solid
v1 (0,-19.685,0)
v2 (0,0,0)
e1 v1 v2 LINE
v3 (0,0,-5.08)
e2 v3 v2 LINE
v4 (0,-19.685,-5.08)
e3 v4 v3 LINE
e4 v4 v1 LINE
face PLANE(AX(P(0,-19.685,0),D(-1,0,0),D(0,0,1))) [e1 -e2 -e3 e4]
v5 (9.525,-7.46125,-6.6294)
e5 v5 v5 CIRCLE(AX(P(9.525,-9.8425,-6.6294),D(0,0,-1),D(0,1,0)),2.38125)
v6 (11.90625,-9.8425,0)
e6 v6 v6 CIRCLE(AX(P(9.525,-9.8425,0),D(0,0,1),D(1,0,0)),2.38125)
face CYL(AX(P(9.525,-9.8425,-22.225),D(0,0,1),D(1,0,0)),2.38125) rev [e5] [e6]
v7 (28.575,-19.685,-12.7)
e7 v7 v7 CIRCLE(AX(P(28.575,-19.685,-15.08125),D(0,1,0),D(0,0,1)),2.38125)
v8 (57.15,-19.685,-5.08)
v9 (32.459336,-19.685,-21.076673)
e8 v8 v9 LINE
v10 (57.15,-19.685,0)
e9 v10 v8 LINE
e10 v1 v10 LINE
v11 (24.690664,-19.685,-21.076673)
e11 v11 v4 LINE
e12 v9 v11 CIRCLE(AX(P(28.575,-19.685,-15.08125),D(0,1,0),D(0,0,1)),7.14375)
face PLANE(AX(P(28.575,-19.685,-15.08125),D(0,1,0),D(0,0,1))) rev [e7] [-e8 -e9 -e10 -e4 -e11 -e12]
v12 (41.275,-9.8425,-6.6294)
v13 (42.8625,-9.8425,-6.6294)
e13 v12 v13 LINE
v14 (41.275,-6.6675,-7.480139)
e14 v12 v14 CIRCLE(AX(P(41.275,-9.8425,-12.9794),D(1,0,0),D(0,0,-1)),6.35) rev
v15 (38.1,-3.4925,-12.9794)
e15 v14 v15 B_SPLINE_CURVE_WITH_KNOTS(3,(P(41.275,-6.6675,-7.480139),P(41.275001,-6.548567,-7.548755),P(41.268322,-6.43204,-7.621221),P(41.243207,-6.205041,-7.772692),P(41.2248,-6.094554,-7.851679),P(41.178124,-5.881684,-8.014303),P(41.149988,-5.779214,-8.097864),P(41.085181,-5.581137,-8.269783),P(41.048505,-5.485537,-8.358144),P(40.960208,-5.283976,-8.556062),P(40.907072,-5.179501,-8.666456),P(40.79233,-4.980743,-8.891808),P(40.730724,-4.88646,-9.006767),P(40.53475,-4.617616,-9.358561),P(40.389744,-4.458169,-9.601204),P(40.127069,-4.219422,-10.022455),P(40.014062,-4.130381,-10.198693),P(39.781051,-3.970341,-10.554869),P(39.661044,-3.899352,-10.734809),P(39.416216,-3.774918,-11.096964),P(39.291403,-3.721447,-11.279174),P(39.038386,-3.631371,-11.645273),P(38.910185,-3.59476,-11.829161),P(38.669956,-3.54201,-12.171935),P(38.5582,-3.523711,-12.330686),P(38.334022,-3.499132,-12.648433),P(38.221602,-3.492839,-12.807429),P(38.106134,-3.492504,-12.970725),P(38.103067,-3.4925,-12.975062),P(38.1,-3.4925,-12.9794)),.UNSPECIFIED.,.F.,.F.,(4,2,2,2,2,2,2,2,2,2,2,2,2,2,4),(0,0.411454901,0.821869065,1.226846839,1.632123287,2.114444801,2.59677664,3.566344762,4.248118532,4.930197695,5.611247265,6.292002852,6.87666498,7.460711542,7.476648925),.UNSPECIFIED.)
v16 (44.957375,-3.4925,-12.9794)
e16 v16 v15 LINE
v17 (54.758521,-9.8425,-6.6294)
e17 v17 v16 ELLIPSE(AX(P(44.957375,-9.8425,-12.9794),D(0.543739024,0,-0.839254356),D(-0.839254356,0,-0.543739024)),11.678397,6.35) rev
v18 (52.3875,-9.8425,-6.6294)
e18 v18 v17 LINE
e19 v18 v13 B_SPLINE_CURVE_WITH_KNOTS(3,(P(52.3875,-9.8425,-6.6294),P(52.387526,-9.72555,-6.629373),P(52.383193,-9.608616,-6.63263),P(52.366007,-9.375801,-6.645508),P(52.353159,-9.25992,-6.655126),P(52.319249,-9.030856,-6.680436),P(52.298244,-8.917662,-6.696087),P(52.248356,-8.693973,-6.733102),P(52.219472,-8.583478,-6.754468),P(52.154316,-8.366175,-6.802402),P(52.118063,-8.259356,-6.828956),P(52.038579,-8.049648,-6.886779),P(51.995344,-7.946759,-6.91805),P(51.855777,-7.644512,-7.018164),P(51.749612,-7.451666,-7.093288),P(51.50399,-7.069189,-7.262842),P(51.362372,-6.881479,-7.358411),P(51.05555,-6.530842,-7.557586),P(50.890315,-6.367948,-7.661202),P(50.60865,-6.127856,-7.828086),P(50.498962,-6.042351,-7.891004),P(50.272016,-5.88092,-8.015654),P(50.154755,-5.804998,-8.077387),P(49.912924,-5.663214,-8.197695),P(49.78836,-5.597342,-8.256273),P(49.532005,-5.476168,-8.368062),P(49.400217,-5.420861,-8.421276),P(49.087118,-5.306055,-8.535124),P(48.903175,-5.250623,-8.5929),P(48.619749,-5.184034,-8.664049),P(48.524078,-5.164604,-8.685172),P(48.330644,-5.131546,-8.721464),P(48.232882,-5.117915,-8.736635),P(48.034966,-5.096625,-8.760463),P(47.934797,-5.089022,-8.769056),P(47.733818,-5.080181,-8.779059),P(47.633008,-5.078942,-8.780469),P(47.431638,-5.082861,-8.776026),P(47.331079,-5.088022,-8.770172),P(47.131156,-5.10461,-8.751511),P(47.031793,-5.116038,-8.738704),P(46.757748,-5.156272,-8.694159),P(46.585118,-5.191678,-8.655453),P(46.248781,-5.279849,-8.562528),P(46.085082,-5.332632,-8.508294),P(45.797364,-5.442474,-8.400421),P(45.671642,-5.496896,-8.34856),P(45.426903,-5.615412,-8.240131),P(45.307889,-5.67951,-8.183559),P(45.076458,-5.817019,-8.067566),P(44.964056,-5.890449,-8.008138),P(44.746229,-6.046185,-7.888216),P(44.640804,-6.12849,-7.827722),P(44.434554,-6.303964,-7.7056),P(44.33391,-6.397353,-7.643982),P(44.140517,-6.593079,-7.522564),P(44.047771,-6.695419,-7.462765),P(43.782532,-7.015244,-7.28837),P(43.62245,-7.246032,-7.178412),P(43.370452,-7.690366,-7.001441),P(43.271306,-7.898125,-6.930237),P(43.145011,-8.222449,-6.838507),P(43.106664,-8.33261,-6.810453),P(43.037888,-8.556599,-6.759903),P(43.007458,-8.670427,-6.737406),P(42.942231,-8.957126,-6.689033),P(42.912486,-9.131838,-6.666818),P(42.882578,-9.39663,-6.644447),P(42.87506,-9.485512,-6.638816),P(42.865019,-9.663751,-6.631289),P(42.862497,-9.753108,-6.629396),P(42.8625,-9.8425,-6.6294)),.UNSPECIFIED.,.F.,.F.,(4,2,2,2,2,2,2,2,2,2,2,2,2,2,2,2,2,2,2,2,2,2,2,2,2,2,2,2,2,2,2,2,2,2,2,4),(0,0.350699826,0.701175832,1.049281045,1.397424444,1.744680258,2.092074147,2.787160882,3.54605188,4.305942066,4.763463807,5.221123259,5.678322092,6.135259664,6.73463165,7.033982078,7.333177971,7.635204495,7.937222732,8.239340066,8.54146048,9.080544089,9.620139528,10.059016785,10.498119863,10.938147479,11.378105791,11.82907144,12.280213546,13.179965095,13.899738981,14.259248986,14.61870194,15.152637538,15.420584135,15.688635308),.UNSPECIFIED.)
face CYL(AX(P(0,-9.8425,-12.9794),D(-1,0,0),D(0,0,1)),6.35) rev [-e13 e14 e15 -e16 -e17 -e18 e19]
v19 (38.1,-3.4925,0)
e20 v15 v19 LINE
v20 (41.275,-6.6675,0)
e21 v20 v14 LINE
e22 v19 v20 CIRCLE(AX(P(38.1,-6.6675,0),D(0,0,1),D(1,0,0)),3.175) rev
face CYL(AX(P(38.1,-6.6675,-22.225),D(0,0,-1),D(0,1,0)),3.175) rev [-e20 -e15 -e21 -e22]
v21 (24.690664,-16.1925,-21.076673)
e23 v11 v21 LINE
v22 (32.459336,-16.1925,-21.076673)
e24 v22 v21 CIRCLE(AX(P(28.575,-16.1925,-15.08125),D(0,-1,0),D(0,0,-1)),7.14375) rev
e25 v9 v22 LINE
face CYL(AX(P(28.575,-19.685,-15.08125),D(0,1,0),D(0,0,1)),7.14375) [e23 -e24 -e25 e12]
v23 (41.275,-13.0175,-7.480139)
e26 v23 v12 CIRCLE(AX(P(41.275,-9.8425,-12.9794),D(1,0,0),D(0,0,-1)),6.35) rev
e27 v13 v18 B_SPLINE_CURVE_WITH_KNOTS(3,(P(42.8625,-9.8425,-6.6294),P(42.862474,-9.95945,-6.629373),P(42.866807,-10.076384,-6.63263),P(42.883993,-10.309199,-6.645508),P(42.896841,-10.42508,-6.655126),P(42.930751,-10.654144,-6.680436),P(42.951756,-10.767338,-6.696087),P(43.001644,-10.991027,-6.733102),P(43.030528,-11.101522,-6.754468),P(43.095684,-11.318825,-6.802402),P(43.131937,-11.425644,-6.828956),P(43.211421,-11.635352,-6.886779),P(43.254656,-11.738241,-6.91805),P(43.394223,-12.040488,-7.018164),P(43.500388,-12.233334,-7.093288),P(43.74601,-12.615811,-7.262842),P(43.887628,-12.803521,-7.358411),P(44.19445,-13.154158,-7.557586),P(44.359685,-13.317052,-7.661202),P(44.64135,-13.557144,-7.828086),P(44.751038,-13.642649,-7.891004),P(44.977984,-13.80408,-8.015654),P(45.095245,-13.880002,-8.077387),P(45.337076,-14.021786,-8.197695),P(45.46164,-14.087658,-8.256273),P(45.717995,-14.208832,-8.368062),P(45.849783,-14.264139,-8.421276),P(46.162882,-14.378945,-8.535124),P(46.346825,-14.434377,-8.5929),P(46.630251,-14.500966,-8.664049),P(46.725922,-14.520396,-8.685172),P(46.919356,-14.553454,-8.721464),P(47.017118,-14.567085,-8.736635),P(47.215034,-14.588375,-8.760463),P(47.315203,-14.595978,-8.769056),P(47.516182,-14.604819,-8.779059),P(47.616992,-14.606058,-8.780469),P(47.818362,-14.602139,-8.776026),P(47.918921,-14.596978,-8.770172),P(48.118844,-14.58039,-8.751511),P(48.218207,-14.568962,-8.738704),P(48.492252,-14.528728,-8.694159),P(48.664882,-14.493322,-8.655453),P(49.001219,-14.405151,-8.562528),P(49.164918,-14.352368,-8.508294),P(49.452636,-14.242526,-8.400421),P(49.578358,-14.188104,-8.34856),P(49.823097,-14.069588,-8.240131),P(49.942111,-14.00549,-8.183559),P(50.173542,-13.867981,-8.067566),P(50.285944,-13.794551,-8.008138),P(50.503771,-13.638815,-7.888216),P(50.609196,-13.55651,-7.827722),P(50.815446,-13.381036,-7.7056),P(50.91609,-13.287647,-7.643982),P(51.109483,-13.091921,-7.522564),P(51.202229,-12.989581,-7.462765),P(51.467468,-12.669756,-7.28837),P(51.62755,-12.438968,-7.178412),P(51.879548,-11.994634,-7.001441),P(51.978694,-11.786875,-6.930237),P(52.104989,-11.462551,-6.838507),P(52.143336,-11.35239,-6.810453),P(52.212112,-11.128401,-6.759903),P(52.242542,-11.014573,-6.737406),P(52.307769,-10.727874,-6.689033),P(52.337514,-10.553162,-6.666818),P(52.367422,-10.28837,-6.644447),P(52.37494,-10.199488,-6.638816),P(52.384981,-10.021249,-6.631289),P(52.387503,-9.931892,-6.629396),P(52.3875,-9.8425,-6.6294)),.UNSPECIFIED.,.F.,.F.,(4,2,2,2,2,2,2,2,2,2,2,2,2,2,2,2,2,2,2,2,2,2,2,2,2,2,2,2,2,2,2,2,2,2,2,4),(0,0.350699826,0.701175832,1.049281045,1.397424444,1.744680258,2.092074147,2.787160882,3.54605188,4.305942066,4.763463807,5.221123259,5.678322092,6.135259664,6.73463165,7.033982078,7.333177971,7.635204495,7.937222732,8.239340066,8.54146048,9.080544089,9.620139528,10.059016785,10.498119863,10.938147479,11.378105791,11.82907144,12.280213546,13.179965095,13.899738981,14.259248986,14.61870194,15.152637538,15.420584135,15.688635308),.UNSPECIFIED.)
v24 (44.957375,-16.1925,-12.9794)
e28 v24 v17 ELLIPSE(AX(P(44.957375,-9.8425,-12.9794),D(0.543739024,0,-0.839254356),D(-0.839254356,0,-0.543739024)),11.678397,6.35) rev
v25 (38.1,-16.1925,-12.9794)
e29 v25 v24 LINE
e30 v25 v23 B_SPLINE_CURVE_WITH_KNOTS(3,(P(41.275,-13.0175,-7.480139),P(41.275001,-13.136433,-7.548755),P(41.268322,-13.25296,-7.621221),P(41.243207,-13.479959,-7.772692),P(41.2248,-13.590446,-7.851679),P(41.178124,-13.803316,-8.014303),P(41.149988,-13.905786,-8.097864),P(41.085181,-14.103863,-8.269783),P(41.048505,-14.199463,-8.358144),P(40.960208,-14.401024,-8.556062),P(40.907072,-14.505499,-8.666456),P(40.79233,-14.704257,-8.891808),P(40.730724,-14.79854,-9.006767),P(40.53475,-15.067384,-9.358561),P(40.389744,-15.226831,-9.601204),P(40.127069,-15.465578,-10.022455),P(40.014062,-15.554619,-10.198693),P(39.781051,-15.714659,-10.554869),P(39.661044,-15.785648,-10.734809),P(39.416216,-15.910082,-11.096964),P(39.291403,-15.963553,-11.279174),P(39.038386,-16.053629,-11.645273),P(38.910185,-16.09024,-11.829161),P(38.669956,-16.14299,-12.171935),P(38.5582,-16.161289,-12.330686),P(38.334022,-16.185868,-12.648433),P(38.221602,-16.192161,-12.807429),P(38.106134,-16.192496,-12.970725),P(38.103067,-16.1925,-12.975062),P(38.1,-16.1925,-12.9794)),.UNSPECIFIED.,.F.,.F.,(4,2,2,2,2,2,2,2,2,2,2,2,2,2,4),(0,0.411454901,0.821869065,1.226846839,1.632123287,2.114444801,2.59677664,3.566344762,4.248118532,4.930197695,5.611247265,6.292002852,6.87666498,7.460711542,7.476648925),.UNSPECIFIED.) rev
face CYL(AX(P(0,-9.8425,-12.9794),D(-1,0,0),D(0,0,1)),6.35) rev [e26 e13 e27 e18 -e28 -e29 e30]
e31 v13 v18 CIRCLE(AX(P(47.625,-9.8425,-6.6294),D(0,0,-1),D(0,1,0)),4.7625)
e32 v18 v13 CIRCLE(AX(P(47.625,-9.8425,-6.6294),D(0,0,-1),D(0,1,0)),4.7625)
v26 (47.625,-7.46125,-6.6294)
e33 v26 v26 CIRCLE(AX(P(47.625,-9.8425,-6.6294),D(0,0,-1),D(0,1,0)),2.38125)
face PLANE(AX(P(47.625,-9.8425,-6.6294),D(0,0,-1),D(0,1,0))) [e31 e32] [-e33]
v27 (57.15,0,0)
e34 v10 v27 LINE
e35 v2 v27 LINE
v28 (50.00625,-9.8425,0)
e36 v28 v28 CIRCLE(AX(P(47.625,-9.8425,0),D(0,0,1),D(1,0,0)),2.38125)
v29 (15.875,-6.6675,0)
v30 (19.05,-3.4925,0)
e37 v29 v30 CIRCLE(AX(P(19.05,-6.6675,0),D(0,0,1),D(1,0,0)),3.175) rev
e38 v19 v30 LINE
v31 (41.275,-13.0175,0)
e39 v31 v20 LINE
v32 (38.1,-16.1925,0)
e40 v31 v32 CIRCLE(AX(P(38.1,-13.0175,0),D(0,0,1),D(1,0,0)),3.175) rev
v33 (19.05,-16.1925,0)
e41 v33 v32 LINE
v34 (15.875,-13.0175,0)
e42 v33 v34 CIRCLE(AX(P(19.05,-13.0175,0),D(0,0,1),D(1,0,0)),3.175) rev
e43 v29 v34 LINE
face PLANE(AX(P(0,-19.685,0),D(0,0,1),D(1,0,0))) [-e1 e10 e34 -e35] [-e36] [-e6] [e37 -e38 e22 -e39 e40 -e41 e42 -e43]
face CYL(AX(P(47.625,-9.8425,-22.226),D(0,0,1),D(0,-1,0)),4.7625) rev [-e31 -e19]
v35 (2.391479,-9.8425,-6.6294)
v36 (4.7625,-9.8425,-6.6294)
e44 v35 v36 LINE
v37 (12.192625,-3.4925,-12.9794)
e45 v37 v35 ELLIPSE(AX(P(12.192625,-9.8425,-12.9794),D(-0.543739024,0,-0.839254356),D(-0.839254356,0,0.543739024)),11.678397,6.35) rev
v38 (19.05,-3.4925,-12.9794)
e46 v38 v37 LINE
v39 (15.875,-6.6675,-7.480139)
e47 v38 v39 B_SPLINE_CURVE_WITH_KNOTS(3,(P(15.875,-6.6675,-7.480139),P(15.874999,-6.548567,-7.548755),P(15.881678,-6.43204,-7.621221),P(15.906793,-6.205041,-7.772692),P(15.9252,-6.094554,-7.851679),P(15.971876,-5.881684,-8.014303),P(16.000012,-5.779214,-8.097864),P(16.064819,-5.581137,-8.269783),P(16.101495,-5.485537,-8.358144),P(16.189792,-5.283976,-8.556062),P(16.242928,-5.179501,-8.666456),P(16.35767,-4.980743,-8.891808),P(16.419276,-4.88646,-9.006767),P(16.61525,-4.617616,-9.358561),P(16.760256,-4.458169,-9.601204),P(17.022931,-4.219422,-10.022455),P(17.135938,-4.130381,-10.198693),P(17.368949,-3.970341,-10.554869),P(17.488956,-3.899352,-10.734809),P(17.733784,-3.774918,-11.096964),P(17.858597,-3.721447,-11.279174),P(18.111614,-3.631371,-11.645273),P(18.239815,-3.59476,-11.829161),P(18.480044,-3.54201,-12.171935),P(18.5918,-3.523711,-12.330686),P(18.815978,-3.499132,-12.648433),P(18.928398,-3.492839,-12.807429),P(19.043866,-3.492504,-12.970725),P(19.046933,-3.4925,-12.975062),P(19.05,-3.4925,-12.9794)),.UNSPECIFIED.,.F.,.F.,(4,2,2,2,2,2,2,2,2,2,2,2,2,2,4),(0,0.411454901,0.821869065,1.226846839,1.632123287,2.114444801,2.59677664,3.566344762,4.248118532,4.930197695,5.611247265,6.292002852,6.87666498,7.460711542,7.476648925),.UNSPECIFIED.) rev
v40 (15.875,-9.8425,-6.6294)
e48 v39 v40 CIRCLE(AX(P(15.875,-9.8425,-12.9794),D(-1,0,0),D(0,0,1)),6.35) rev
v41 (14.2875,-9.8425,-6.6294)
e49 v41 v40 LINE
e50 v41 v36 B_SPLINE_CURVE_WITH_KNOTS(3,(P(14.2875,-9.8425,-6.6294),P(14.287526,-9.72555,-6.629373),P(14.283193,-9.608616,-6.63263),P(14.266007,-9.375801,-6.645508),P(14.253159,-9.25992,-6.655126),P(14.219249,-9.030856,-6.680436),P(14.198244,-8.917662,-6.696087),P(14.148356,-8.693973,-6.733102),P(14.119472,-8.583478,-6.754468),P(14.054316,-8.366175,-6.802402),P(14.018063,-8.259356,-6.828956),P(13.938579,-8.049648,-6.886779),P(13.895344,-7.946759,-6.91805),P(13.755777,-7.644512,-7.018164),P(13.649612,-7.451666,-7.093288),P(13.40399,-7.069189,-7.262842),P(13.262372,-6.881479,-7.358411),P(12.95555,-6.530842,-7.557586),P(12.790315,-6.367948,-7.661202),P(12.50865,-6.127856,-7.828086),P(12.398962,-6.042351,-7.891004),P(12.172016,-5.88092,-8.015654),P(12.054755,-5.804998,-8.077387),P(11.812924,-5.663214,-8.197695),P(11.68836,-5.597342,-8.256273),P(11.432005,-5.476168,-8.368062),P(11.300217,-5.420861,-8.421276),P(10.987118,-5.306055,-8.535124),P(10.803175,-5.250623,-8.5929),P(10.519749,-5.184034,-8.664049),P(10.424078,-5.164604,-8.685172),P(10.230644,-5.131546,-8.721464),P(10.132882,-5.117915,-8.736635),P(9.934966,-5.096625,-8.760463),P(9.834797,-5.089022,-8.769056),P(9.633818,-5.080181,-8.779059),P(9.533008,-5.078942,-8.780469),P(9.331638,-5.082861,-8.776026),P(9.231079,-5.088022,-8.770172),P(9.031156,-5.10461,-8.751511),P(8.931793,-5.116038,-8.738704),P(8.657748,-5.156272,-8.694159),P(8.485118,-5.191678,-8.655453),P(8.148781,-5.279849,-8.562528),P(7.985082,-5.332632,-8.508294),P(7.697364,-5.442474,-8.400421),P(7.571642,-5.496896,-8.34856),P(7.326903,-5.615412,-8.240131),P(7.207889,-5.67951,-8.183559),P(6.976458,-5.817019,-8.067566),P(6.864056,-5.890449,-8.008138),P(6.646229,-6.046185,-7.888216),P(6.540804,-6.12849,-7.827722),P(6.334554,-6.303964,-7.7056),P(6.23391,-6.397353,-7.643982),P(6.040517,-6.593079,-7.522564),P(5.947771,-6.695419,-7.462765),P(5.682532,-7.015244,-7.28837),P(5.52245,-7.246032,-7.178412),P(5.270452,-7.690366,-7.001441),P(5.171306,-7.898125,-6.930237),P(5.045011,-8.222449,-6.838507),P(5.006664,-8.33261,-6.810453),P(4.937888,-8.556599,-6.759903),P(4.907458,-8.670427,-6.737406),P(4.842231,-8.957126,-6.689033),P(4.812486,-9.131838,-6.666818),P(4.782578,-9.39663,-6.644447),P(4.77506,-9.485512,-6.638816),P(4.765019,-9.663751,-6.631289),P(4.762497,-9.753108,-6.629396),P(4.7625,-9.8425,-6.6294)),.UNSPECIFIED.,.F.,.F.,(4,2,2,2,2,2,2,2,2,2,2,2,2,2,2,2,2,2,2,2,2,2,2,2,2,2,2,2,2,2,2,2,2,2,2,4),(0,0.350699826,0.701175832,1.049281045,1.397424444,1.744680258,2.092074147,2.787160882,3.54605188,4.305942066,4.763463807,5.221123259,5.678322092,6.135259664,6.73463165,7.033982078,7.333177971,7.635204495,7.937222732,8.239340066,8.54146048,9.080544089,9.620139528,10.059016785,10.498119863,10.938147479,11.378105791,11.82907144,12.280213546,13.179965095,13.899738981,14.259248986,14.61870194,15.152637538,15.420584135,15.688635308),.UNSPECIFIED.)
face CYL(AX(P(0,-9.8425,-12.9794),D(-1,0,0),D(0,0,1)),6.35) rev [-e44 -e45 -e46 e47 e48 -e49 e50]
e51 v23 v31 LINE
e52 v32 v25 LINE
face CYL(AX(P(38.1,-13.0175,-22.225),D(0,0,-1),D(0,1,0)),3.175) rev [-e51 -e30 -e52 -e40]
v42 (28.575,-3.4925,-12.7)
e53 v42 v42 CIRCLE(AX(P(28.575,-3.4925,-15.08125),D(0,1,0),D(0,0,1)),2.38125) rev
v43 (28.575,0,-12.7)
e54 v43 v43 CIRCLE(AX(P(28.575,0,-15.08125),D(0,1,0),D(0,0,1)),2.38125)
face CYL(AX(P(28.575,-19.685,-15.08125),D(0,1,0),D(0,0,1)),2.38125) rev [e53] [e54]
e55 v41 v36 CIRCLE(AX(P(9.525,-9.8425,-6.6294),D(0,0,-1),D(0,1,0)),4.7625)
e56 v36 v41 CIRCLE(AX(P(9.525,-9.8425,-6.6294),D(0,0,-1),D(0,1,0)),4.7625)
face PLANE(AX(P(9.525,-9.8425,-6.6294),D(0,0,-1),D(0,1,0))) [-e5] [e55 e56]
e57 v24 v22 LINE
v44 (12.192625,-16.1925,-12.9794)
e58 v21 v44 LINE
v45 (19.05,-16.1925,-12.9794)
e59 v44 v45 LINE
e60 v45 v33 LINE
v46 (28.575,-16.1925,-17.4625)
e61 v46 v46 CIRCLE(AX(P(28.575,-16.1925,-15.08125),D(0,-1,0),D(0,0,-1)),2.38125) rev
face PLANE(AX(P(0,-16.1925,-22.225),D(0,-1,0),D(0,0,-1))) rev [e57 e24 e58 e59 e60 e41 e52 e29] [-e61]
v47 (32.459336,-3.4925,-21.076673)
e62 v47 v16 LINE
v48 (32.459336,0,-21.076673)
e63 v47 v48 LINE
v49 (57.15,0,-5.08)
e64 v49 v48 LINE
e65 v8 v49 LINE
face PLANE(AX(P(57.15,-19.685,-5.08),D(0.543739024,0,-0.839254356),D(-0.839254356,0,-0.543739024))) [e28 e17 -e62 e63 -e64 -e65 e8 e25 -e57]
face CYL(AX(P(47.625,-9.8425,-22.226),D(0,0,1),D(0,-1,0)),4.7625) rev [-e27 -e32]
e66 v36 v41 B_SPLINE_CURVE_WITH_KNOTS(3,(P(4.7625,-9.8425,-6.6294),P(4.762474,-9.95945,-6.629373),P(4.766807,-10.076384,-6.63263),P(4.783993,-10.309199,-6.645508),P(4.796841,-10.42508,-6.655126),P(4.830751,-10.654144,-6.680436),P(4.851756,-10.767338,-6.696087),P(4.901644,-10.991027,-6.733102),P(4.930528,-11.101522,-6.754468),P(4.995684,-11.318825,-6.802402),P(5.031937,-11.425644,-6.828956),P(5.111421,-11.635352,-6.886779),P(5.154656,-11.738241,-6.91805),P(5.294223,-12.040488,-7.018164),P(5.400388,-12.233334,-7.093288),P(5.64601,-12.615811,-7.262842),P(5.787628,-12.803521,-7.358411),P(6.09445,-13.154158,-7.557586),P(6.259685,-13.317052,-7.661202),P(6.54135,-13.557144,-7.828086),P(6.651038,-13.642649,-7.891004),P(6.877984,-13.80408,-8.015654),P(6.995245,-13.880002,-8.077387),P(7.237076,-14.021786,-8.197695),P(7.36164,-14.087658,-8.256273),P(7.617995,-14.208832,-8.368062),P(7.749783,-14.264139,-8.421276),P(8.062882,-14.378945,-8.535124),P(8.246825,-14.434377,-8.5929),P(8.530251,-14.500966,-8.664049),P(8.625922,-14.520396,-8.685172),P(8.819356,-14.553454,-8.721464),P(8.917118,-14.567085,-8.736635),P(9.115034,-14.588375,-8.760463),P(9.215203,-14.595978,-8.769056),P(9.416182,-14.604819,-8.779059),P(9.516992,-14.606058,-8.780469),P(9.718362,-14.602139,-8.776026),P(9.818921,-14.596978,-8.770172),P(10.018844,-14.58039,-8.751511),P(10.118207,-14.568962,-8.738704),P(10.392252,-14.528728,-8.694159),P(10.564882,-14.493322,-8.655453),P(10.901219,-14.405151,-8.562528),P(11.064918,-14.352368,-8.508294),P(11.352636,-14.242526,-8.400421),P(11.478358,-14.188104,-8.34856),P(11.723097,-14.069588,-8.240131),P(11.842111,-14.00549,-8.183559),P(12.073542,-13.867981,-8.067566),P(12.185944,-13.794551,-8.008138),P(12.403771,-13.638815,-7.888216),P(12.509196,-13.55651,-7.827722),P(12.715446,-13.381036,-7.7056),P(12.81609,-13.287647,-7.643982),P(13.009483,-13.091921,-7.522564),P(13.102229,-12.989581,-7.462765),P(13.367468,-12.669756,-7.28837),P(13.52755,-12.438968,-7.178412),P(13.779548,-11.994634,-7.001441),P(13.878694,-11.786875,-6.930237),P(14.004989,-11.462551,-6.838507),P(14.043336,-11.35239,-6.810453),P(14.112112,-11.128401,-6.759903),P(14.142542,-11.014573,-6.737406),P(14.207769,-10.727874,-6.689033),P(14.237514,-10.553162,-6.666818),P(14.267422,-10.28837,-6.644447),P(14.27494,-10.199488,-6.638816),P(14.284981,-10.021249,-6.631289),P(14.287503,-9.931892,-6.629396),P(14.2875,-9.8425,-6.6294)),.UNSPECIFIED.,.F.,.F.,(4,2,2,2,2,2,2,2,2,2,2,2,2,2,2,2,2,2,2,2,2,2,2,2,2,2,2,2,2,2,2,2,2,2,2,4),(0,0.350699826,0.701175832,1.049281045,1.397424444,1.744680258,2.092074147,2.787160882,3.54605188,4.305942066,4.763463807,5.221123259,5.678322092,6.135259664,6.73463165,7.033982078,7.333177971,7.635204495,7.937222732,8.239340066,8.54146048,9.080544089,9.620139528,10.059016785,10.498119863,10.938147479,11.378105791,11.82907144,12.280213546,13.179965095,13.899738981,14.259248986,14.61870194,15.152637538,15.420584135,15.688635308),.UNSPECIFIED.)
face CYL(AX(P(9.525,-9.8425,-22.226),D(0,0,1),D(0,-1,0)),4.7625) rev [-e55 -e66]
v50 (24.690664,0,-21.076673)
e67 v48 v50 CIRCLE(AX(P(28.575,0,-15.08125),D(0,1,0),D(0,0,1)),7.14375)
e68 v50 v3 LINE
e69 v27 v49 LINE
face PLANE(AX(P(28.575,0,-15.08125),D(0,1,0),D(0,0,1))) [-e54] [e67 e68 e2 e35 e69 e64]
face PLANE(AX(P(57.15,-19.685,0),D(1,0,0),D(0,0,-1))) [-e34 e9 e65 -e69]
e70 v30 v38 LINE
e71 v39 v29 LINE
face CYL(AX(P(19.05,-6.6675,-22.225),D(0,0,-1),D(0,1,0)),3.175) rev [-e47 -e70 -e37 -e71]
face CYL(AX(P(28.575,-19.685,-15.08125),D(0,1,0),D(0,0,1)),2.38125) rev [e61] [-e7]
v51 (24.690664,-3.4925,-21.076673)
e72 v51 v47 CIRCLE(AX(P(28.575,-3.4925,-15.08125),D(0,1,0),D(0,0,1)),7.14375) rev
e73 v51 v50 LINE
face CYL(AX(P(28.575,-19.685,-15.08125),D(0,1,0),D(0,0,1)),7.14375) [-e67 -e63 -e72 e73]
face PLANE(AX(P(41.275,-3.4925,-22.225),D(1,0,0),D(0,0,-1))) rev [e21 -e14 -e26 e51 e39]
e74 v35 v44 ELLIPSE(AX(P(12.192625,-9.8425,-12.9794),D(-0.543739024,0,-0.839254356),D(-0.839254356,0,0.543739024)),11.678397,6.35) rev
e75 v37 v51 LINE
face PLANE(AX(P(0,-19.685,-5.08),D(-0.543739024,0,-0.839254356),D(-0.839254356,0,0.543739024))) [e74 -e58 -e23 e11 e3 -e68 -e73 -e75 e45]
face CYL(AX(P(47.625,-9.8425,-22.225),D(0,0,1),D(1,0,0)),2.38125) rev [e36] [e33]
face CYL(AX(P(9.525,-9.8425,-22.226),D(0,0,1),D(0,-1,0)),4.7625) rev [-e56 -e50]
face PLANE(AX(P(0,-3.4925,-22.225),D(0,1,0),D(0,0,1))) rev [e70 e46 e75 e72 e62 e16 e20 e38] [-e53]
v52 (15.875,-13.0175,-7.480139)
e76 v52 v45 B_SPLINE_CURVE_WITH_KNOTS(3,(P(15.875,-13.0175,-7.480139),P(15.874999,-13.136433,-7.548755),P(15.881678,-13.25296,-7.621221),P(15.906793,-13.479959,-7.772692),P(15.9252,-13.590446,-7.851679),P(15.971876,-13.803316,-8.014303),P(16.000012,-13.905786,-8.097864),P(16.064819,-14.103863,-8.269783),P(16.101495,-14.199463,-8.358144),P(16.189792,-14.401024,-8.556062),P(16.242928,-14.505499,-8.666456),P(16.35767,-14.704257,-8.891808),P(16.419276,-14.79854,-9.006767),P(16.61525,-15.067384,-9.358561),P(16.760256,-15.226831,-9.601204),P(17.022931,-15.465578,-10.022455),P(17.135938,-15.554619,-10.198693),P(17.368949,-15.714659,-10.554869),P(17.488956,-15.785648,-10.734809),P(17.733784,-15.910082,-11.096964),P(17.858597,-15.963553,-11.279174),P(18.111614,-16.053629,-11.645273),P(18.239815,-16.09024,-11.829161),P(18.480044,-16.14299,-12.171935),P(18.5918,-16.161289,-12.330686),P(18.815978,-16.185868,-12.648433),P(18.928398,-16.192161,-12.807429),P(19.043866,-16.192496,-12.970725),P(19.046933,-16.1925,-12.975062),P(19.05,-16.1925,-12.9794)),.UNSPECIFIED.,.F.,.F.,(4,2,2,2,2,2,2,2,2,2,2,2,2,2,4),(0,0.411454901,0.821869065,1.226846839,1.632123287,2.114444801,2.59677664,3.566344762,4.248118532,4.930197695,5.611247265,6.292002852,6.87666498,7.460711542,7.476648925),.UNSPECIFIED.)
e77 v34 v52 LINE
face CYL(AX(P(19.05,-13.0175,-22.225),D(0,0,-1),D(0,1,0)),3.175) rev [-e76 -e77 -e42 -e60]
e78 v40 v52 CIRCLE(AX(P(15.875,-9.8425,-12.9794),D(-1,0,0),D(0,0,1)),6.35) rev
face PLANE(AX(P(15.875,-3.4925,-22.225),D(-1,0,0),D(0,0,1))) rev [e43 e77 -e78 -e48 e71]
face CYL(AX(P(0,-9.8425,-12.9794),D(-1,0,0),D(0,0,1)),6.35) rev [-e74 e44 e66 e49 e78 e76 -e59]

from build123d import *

# Parameters (mm, degrees)
SKETCH1_R              = 2.38125
BOSS_EXTRUDE1_DEPTH    = 19.685
SKETCH2_W              = 15.5956
SKETCH2_H              = 12.7
CUT_EXTRUDE1_DEPTH     = 65.401648659
FILLET1_R              = 6.35
SKETCH3_R              = 2.38125
SKETCH3_W              = 25.4
SKETCH3_H              = 12.7
CUT_EXTRUDE2_DEPTH     = 65.40164869
FILLET2_R              = 3.175
CUT_EXTRUDE5_OUTLINE_R = 4.7625
CUT_EXTRUDE5_DEPTH     = 2.149867926


with BuildPart() as part:
    # Sketch1 → Boss-Extrude1 (new body)
    with BuildSketch(Plane(origin=(0, 0, 0), x_dir=(1, 0, 0), z_dir=(0, 1, 0))):
        with BuildLine():
            Line((0, 5.08), (24.690664344, 21.076673302))
            ThreePointArc((24.690664344, 21.076673302), (28.575, 22.225), (32.459335656, 21.076673302))
            Line((32.459335656, 21.076673302), (57.15, 5.08))
            Line((57.15, 5.08), (57.15, 0))
            Line((57.15, 0), (0, 0))
            Line((0, 0), (0, 5.08))
        make_face()
        with Locations(Location((28.575, 15.08125, 0), (0, 0, 270))):
            Circle(SKETCH1_R, mode=Mode.SUBTRACT)
    extrude(amount=-BOSS_EXTRUDE1_DEPTH)

    # Sketch2 → Cut-Extrude1 (cut, through all)
    with BuildSketch(Plane(origin=(57.15, 0, 0), x_dir=(0, 0, -1), z_dir=(1, 0, 0))):
        with Locations((14.4272, -9.8425)):
            Rectangle(SKETCH2_W, SKETCH2_H)
    extrude(amount=-CUT_EXTRUDE1_DEPTH, mode=Mode.SUBTRACT)

    # Fillet1
    fillet1_edges = [part.edges().sort_by_distance(p)[0] for p in [
        (28.575, -16.1925, -6.6294),
        (28.575, -3.4925, -6.6294),
    ]]
    fillet(fillet1_edges, radius=FILLET1_R - 0.0001)  # a hair under: the kernel refuses the full size

    # Sketch3 → Cut-Extrude2 (cut, through all)
    with BuildSketch(Plane.XY):
        with Locations((9.525, -9.8425)):
            Circle(SKETCH3_R)
        with Locations((47.625, -9.8425)):
            Circle(SKETCH3_R)
        with Locations((28.575, -9.8425)):
            Rectangle(SKETCH3_W, SKETCH3_H)
    extrude(amount=-CUT_EXTRUDE2_DEPTH, mode=Mode.SUBTRACT)

    # Fillet2
    fillet2_edges = [part.edges().sort_by_distance(p)[0] for p in [
        (41.275, -3.4925, -6.48965),
        (15.875, -16.1925, -6.48965),
        (41.275, -16.1925, -6.48965),
        (15.875, -3.4925, -6.48965),
    ]]
    fillet(fillet2_edges, radius=FILLET2_R)

    # Cut-Extrude5: read off the stored shape, not the designer's step
    # Cut-Extrude5 outline → Cut-Extrude5 (cut)
    with BuildSketch(Plane(origin=(0, 0, -6.6294), x_dir=(-1, 0, 0), z_dir=(0, 0, -1))):
        with Locations((-47.625, -9.8425)):
            Circle(CUT_EXTRUDE5_OUTLINE_R)
        with Locations((-9.525, -9.8425)):
            Circle(CUT_EXTRUDE5_OUTLINE_R)
    extrude(amount=CUT_EXTRUDE5_DEPTH, mode=Mode.SUBTRACT)


solid = part.part
